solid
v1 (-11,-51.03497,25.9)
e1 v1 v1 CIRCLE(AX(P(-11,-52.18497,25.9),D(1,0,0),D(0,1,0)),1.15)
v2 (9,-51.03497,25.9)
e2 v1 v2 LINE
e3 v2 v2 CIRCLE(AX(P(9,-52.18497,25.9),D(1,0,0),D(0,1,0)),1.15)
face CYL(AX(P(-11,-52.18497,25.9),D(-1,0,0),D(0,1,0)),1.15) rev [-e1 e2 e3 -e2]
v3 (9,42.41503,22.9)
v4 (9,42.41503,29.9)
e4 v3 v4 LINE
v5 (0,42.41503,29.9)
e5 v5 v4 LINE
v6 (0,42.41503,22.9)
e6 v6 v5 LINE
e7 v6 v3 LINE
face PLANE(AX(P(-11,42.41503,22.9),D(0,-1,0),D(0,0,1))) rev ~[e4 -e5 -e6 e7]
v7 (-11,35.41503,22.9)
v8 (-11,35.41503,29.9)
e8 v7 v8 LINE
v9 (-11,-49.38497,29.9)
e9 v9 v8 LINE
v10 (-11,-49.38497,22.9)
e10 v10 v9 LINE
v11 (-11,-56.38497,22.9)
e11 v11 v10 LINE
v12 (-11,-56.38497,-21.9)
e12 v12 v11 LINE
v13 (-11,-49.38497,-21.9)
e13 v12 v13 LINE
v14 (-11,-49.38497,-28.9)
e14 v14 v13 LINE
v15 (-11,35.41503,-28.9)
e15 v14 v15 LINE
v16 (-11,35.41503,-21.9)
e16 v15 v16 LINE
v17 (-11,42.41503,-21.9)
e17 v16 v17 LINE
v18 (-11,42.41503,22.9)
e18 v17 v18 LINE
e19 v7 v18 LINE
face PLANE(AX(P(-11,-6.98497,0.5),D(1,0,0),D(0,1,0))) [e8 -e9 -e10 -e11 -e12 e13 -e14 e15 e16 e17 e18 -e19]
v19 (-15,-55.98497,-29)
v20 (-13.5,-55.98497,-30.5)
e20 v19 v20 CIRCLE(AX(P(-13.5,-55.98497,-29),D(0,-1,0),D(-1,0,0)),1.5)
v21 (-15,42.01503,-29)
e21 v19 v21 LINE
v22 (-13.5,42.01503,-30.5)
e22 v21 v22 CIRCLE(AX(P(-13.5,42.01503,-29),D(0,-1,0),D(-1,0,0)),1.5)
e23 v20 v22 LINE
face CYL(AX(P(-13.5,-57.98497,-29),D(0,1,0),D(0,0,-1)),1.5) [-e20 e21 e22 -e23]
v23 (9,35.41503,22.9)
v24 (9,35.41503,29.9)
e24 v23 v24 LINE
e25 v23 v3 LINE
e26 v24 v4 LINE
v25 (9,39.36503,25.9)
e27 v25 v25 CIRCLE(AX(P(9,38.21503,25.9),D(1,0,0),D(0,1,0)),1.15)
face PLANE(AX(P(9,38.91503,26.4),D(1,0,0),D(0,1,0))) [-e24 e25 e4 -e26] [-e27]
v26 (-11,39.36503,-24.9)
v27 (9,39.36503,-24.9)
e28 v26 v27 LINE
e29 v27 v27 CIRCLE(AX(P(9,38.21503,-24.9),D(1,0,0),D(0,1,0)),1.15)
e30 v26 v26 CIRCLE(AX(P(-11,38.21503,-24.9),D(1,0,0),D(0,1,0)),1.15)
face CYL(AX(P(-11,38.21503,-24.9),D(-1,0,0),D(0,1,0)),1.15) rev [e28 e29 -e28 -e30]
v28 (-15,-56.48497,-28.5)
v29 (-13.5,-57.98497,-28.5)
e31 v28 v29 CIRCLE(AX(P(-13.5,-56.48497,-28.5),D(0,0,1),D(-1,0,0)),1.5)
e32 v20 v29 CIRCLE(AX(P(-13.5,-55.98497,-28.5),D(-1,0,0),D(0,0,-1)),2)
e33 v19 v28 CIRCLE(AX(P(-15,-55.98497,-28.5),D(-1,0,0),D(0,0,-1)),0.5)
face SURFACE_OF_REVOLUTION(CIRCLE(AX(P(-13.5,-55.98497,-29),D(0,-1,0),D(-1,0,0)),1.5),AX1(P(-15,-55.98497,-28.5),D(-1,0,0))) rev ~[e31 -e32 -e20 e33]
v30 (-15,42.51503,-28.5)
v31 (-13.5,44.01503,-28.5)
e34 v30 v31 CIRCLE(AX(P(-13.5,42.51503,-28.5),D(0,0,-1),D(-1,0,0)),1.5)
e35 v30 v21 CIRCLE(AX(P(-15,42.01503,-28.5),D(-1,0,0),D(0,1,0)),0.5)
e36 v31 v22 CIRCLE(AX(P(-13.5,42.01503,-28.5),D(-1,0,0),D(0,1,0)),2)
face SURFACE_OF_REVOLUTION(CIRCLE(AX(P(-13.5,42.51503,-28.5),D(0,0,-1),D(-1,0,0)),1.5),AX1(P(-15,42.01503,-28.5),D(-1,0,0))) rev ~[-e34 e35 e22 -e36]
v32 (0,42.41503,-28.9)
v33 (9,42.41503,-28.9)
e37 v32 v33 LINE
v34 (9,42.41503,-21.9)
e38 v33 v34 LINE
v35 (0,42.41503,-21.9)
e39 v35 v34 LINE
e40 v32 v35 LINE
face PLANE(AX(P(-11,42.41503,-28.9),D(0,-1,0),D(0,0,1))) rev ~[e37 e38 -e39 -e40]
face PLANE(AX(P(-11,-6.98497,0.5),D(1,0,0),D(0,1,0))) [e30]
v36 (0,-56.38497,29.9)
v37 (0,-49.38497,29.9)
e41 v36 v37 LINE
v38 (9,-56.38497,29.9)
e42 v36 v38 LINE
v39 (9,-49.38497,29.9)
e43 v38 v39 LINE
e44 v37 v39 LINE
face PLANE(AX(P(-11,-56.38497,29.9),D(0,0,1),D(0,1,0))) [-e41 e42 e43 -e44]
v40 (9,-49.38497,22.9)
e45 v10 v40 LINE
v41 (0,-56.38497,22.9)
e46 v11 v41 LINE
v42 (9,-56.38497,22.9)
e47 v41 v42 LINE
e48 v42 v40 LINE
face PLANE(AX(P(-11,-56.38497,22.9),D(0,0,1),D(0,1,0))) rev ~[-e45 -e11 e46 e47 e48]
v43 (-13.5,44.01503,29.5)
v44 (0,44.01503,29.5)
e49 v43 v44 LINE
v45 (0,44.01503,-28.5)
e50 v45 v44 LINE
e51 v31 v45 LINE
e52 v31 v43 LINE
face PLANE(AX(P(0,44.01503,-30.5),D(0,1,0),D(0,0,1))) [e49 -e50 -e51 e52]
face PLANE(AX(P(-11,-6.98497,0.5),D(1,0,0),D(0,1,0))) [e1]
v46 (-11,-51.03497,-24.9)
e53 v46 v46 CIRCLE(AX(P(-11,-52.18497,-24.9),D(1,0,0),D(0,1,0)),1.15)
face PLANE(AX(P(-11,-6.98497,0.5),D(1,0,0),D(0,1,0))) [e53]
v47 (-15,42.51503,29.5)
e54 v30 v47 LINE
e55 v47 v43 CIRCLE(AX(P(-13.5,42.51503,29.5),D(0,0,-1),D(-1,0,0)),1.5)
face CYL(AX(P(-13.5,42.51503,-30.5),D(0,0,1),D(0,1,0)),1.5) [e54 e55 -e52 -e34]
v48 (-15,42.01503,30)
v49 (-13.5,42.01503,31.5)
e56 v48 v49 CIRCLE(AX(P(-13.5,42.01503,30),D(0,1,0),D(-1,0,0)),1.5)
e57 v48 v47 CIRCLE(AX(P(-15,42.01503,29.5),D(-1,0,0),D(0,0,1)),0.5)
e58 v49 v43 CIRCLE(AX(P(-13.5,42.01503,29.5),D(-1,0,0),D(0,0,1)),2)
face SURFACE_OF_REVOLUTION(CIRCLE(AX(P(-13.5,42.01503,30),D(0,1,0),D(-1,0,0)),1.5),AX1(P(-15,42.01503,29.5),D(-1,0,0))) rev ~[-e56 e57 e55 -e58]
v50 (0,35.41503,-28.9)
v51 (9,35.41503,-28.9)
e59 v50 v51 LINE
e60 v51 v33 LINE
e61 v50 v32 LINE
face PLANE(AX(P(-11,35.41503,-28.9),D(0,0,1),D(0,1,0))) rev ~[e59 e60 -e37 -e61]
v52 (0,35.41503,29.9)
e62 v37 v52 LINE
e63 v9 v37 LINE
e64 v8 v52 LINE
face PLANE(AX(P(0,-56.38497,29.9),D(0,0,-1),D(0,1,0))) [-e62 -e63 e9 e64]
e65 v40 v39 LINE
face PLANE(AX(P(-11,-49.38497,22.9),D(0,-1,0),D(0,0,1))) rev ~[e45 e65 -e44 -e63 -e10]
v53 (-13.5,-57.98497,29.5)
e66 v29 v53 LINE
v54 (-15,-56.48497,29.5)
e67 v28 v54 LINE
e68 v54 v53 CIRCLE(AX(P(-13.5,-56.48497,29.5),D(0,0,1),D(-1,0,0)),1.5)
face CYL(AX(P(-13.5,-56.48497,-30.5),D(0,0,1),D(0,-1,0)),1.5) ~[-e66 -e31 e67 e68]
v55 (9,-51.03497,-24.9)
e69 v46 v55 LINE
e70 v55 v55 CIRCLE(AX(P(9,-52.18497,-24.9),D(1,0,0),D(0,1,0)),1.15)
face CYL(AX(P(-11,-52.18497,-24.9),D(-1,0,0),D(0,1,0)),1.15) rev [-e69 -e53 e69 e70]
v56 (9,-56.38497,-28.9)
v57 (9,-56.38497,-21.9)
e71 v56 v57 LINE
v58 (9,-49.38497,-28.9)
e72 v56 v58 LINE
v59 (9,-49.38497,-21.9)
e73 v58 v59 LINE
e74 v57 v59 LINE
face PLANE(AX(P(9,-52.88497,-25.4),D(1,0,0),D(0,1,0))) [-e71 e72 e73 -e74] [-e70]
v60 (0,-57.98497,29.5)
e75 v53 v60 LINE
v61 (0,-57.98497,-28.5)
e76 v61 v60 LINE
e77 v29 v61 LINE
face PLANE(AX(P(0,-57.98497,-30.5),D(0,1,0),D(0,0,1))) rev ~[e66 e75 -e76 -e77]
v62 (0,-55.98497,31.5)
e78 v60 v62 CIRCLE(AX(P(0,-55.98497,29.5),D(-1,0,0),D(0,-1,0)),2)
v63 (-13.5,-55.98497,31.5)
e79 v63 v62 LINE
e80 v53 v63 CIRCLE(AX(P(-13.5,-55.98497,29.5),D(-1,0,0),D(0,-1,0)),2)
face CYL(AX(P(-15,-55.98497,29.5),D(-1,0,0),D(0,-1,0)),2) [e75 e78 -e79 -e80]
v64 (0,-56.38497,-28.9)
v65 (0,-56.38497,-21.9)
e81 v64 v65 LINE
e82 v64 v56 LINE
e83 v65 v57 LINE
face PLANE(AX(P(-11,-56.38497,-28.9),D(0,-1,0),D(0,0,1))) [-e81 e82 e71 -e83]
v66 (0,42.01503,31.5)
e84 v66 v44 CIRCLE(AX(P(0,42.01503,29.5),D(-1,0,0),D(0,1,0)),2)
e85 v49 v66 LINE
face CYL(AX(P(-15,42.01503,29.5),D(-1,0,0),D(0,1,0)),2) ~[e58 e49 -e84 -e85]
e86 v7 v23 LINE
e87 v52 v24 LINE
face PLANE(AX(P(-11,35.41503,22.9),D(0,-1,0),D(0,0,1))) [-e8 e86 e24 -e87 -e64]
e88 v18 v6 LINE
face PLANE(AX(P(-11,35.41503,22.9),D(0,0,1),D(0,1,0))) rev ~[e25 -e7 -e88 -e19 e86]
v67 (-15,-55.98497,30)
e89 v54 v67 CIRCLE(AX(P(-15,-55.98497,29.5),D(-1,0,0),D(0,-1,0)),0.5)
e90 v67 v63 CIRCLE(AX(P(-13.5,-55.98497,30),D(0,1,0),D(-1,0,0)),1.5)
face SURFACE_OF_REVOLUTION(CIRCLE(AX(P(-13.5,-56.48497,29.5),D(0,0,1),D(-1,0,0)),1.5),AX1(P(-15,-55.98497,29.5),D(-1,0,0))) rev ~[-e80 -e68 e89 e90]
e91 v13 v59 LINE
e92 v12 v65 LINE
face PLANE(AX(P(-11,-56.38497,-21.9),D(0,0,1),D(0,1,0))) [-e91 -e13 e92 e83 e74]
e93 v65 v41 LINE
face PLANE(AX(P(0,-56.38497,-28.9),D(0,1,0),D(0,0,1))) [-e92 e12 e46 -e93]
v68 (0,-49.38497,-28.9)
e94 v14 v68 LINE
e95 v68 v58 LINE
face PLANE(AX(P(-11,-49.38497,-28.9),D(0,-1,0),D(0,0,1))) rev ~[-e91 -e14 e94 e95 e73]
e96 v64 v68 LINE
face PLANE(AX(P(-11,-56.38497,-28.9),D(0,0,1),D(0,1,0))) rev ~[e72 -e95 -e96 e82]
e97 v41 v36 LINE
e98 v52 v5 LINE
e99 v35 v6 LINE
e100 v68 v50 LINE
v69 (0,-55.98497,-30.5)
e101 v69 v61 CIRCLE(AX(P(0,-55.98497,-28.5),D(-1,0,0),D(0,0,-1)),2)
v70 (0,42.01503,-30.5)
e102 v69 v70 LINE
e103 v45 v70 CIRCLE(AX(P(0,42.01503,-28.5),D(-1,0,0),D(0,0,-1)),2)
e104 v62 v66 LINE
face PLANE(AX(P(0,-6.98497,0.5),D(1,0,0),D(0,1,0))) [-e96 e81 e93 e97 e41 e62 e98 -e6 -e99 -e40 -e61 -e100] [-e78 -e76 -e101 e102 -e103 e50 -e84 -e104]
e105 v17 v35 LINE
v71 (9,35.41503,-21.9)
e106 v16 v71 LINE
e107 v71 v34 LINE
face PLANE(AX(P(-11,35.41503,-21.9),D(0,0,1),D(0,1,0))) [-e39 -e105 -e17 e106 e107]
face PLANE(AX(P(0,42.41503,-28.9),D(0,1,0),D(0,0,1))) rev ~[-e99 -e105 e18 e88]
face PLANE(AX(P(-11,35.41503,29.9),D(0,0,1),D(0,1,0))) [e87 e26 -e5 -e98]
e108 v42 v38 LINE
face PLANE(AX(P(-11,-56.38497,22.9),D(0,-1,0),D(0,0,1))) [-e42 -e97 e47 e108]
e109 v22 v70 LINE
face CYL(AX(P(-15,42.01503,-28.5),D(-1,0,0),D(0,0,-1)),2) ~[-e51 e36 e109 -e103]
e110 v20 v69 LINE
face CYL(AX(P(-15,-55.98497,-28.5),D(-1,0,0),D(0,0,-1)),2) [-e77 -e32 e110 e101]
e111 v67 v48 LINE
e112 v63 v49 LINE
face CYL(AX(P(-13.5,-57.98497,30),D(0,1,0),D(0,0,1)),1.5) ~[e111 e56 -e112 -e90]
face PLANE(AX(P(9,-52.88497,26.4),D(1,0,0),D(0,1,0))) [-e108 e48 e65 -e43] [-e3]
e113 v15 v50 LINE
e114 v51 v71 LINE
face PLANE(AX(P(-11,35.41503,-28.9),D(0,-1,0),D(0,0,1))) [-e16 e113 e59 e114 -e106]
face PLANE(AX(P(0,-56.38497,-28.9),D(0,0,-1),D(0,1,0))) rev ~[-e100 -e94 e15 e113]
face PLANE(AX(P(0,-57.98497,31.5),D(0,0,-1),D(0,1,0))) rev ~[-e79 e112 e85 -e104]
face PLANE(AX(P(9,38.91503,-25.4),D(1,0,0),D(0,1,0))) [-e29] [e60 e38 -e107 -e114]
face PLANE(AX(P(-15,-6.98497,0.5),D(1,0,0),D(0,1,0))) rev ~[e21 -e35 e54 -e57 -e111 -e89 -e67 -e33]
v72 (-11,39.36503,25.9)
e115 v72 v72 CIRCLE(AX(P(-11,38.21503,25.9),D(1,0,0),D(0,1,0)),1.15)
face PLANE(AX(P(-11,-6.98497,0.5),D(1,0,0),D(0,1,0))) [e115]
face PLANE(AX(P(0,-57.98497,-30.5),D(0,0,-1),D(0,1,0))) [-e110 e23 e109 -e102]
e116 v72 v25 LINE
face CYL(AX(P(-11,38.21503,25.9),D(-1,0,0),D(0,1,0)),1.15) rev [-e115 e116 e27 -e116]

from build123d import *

# Parameters (mm, degrees)
F0_W         = 102
F0_H         = 62
F1_DEPTH     = 15
F2_R         = 1.5
F3_W         = 98.8
F3_H         = 58.8
F4_DEPTH     = 11
F5_W         = 7
F5_H         = 7
F5_R         = 1.15
F6_DEPTH     = 20
F7_T1_DEPTH  = 20
F7_T4_ANGLE  = 90
F7_T6_ANGLE  = 90
F7_T8_ANGLE  = 90
F7_T10_ANGLE = 90


# Not quite as in the source:
# - a fillet or chamfer that OpenCascade refuses, or shapes differently, is made with other operations: its cross-section is extruded or revolved along the edge and cut away or added
# - a feature names something its author has since deleted; it is built from what else it names


with BuildPart() as f1:
    # F0 (on Right) → F1 (new body)
    with BuildSketch(Plane.YZ):
        with Locations((-6.9849695861, 0.5)):
            Rectangle(F0_W, F0_H)
    extrude(amount=-F1_DEPTH)

    # F2
    f2_edges = [f1.edges().sort_by_distance(p)[0] for p in [
        (-15, -6.98497, 31.5),
        (-15, -57.98497, 0.5),
        (-15, -6.98497, -30.5),
        (-15, 44.01503, 0.5),
    ]]
    fillet(f2_edges, radius=F2_R)

    # F3 (on face) → F4 (cut)
    with BuildSketch(Plane.YZ):
        with Locations((-6.9849695861, 0.5)):
            Rectangle(F3_W, F3_H)
    extrude(amount=-F4_DEPTH, mode=Mode.SUBTRACT)

    # F5 (on face) → F6 (join)
    with BuildSketch(Plane.YZ.offset(-11)):
        with Locations((-52.8849695861, -25.4)):
            Rectangle(F5_W, F5_H)
        with Locations((-52.1849695861, -24.9)):
            Circle(F5_R, mode=Mode.SUBTRACT)
        with Locations((38.9150304139, -25.4)):
            Rectangle(F5_W, F5_H)
        with Locations((38.2150304139, -24.9)):
            Circle(F5_R, mode=Mode.SUBTRACT)
        with Locations((38.9150304139, 26.4)):
            Rectangle(F5_W, F5_H)
        with Locations((38.2150304139, 25.9)):
            Circle(F5_R, mode=Mode.SUBTRACT)
        with Locations((-52.8849695861, 26.4)):
            Rectangle(F5_W, F5_H)
        with Locations((-52.1849695861, 25.9)):
            Circle(F5_R, mode=Mode.SUBTRACT)
    extrude(amount=F6_DEPTH)

    # F7: fillet of radius 2 on 4 edges, made by hand

    # F7_s2 → F7_t1 (cut)
    with BuildSketch(Plane.YZ.offset(-15)):
        with BuildLine():
            ThreePointArc((-55.9849695861, -30.5), (-57.3991831485, -29.9142135624), (-57.9849695861, -28.5))
            Line((-57.9849695861, -28.5), (-57.9849695861, -30.5))
            Line((-57.9849695861, -30.5), (-55.9849695861, -30.5))
        make_face()
        with BuildLine():
            ThreePointArc((-57.9849695861, 29.5), (-57.3991831485, 30.9142135624), (-55.9849695861, 31.5))
            Line((-55.9849695861, 31.5), (-57.9849695861, 31.5))
            Line((-57.9849695861, 31.5), (-57.9849695861, 29.5))
        make_face()
        with BuildLine():
            ThreePointArc((44.0150304139, 29.5), (43.4292439762, 30.9142135624), (42.0150304139, 31.5))
            Line((42.0150304139, 31.5), (44.0150304139, 31.5))
            Line((44.0150304139, 31.5), (44.0150304139, 29.5))
        make_face()
        with BuildLine():
            ThreePointArc((42.0150304139, -30.5), (43.4292439762, -29.9142135624), (44.0150304139, -28.5))
            Line((44.0150304139, -28.5), (44.0150304139, -30.5))
            Line((44.0150304139, -30.5), (42.0150304139, -30.5))
        make_face()
    extrude(amount=F7_T1_DEPTH, mode=Mode.SUBTRACT)

    # F7_s3 → F7_t4 (revolve, cut)
    with BuildSketch(Plane.XY.offset(-28.5)):
        with BuildLine():
            ThreePointArc((-15, 42.5150304139), (-14.5606601718, 43.5756905856), (-13.5, 44.0150304139))
            Line((-13.5, 44.0150304139), (-15, 44.0150304139))
            Line((-15, 44.0150304139), (-15, 42.5150304139))
        make_face()
    revolve(axis=Axis((-15, 42.0150304139, -28.5), (-1, 0, 0)), revolution_arc=F7_T4_ANGLE, mode=Mode.SUBTRACT)

    # F7_s5 → F7_t6 (revolve, cut)
    with BuildSketch(Plane.XZ.offset(-42.0150304139)):
        with BuildLine():
            ThreePointArc((-15, 30), (-14.5606601718, 31.0606601718), (-13.5, 31.5))
            Line((-13.5, 31.5), (-15, 31.5))
            Line((-15, 31.5), (-15, 30))
        make_face()
    revolve(axis=Axis((-15, 42.0150304139, 29.5), (-1, 0, 0)), revolution_arc=F7_T6_ANGLE, mode=Mode.SUBTRACT)

    # F7_s7 → F7_t8 (revolve, cut)
    with BuildSketch(Plane.XY.offset(29.5)):
        with BuildLine():
            ThreePointArc((-15, -56.4849695861), (-14.5606601718, -57.5456297579), (-13.5, -57.9849695861))
            Line((-13.5, -57.9849695861), (-15, -57.9849695861))
            Line((-15, -57.9849695861), (-15, -56.4849695861))
        make_face()
    revolve(axis=Axis((-15, -55.9849695861, 29.5), (-1, 0, 0)), revolution_arc=F7_T8_ANGLE, mode=Mode.SUBTRACT)

    # F7_s9 → F7_t10 (revolve, cut)
    with BuildSketch(Plane.XZ.offset(55.9849695861)):
        with BuildLine():
            ThreePointArc((-15, -29), (-14.5606601718, -30.0606601718), (-13.5, -30.5))
            Line((-13.5, -30.5), (-15, -30.5))
            Line((-15, -30.5), (-15, -29))
        make_face()
    revolve(axis=Axis((-15, -55.9849695861, -28.5), (-1, 0, 0)), revolution_arc=F7_T10_ANGLE, mode=Mode.SUBTRACT)


solid = f1.part
